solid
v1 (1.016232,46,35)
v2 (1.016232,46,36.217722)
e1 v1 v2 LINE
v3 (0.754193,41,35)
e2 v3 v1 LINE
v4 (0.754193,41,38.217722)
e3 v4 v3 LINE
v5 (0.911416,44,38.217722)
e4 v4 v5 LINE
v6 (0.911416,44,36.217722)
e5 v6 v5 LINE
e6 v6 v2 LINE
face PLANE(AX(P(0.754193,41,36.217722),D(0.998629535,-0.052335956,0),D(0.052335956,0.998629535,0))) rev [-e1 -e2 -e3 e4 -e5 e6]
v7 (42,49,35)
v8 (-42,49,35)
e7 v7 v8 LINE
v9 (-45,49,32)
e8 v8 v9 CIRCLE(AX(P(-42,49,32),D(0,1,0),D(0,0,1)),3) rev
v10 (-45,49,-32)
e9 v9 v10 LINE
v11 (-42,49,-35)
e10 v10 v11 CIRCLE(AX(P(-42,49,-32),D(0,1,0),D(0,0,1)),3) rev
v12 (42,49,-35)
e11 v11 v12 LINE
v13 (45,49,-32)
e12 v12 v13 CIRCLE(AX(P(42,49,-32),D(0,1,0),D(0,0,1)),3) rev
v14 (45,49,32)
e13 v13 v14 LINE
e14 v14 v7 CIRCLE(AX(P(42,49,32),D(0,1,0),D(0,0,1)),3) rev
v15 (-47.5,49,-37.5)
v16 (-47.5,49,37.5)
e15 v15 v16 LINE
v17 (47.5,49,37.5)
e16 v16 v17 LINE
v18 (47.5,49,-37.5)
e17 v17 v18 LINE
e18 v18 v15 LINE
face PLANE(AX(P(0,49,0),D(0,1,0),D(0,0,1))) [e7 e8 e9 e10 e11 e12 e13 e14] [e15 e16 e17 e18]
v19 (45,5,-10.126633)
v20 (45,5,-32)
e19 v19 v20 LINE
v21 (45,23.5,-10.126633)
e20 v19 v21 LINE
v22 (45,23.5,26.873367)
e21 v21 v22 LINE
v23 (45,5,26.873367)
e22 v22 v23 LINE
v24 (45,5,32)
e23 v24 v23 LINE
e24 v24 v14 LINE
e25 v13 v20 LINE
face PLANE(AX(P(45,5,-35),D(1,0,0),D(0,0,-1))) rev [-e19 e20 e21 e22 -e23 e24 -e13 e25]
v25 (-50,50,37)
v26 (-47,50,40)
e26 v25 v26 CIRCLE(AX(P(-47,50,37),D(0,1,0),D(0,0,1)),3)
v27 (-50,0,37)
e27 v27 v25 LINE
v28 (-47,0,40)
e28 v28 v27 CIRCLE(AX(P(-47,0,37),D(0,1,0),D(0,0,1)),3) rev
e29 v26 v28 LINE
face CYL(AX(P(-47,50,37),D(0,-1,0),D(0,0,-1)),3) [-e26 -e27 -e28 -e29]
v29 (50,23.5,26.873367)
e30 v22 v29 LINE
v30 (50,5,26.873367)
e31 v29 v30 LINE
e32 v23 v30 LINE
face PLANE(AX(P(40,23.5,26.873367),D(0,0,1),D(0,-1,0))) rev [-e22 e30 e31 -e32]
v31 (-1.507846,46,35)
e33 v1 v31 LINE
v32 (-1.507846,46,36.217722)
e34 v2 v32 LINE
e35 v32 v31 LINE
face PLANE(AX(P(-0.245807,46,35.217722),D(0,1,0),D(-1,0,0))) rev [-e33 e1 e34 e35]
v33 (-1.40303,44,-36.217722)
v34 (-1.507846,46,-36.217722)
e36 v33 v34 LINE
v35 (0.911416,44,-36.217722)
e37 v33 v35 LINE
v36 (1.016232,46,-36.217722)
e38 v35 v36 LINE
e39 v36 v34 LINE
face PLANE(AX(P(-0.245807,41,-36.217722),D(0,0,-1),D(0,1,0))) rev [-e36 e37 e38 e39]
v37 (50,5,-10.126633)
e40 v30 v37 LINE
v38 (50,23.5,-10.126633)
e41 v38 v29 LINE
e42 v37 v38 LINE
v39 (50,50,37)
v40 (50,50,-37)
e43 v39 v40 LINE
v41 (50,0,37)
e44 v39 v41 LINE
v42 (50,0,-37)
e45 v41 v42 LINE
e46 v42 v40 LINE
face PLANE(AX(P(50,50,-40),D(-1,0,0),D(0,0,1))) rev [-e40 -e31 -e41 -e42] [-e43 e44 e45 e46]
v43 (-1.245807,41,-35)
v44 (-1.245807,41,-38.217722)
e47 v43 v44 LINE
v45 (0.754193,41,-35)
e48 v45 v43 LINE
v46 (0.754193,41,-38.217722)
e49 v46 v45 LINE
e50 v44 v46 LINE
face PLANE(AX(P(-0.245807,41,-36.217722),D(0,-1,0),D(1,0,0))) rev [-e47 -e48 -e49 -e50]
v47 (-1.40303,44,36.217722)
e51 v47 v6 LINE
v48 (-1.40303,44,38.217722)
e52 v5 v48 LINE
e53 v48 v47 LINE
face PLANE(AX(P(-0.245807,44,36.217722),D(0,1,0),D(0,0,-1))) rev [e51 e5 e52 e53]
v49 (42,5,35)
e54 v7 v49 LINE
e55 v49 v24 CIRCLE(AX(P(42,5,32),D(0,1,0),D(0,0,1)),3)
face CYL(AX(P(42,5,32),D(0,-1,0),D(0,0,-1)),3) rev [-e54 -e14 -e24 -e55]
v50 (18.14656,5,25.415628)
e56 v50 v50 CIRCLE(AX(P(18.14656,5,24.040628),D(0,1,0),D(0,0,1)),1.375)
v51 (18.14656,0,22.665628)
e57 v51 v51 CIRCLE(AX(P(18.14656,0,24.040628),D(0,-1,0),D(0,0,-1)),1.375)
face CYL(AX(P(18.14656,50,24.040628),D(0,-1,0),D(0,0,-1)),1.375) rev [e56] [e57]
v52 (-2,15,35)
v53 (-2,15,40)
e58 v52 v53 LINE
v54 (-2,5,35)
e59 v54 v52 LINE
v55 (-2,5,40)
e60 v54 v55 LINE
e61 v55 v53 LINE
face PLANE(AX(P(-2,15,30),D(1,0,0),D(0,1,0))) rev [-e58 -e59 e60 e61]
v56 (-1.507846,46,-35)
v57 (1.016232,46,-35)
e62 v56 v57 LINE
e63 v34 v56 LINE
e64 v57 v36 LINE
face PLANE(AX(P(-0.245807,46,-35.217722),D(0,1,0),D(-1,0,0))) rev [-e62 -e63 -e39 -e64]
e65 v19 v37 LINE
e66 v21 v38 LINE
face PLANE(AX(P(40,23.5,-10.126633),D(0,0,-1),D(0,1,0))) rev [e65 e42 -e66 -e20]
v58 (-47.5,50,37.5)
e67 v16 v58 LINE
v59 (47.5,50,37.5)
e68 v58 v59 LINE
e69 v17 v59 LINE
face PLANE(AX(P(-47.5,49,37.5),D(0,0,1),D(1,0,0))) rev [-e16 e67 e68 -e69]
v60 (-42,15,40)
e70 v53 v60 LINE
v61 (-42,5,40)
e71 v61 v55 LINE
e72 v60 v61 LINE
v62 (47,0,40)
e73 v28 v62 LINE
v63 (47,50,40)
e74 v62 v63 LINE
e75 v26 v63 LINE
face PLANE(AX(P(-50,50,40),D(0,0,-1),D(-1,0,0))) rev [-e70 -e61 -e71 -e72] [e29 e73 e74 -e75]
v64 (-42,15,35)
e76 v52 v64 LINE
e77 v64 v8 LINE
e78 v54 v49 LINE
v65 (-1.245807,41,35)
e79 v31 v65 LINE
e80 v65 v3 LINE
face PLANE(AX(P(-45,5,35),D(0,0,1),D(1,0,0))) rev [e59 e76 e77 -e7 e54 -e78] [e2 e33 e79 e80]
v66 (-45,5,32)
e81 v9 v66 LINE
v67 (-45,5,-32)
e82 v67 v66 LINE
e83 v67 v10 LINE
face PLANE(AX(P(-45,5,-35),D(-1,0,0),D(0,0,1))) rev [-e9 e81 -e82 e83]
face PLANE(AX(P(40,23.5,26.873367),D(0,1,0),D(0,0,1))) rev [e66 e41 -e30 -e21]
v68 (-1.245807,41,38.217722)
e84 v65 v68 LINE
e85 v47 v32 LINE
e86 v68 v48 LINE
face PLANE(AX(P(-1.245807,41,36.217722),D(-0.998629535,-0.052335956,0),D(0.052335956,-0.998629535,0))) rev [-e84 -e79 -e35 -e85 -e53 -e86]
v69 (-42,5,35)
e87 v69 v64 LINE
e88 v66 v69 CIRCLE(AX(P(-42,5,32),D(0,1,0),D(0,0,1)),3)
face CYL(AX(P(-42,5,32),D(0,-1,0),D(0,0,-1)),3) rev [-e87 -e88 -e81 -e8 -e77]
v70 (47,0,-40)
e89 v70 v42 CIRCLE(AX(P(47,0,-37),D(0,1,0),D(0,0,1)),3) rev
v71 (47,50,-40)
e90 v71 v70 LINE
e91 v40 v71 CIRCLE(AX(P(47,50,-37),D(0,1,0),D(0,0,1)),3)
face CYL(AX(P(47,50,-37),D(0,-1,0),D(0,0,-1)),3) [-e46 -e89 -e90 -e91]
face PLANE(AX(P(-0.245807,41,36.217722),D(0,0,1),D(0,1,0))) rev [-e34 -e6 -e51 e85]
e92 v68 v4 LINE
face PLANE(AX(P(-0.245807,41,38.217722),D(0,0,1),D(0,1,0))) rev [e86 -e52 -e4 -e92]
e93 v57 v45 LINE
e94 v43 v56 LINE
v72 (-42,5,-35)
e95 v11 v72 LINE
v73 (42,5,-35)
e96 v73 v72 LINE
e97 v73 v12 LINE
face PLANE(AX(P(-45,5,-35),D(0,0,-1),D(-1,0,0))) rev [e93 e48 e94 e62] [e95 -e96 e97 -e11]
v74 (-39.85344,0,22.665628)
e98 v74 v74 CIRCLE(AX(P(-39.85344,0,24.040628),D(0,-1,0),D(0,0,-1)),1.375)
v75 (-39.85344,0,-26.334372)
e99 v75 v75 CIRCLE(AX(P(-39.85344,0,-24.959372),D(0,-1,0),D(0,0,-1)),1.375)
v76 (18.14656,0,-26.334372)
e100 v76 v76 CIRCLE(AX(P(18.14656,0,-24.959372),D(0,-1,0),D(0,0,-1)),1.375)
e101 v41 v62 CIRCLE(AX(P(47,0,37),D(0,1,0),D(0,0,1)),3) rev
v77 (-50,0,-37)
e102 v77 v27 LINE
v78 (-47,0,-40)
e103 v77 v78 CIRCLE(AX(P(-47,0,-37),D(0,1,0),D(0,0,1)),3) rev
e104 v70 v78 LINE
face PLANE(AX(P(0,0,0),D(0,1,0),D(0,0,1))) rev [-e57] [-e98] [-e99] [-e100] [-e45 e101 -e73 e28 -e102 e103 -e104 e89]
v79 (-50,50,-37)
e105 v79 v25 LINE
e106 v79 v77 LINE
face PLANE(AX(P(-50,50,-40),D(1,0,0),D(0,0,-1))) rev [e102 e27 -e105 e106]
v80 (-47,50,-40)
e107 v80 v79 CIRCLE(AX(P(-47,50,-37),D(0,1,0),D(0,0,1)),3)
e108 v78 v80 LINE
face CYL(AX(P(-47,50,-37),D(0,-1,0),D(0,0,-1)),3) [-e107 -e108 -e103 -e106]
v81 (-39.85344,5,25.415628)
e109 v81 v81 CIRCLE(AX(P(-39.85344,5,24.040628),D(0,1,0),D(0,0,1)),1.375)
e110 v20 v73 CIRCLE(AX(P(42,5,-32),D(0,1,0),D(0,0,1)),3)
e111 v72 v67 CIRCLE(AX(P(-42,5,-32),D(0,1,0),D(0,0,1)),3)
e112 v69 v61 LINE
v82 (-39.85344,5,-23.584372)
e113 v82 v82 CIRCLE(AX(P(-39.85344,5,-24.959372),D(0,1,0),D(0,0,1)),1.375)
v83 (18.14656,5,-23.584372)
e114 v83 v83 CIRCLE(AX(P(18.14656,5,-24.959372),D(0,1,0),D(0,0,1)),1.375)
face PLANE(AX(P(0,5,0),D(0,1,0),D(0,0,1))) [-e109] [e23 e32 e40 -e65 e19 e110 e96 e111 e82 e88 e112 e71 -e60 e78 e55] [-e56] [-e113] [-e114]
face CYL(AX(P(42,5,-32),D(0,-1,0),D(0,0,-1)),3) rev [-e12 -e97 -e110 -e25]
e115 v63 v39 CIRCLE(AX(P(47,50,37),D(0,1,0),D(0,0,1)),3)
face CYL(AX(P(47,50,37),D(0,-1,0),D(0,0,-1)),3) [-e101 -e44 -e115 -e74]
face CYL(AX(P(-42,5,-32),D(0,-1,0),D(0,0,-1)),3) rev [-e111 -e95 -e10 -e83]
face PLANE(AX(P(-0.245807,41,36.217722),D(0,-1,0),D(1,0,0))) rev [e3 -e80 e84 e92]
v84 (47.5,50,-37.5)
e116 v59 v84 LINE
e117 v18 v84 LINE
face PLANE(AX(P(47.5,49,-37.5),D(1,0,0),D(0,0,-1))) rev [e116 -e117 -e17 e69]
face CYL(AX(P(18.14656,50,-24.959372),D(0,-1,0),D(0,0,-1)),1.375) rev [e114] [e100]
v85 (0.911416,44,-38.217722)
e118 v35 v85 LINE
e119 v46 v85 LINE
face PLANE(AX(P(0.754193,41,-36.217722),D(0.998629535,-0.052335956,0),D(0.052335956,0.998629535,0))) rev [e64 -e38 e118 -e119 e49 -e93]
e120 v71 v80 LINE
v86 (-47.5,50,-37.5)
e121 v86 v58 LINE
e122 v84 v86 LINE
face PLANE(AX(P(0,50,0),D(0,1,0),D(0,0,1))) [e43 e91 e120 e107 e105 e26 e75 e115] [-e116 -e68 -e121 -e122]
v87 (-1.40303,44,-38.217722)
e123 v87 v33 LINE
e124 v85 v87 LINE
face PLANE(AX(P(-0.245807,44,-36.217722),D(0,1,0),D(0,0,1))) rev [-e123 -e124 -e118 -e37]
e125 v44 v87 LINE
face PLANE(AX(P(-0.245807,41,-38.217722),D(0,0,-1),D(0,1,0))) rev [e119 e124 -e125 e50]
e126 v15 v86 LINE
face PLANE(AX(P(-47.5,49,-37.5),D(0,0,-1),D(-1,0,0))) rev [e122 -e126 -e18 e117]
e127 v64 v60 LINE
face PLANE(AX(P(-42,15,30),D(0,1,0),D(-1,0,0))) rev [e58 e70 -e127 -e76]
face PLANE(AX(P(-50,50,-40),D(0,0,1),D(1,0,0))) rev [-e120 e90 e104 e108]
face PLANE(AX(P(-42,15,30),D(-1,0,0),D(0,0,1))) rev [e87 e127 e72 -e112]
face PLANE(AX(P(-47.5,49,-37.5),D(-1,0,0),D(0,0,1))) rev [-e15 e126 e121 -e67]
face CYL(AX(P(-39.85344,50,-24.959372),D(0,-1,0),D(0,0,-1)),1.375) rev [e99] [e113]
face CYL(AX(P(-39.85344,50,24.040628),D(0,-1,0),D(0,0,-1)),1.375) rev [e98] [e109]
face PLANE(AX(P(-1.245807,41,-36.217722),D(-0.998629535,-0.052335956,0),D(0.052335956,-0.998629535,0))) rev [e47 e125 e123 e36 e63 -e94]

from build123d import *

# Parameters (mm, degrees)
SKETCH2_W            = 100
SKETCH2_H            = 80
BOSS_EXTRUDE1_DEPTH  = 50
SKETCH3_W            = 90
SKETCH3_H            = 70
CUT_EXTRUDE1_DEPTH   = 45
FILLET2_R            = 3
SKETCH4_W            = 95
SKETCH4_H            = 75
CUT_EXTRUDE2_DEPTH   = 1
SKETCH5_W            = 40
SKETCH5_H            = 10
CUT_EXTRUDE3_DEPTH   = 10
SNAP_START           = -38.217722162
SNAP_GROOVE1_DEPTH   = 3.217722162
SNAP_START_2         = -36.217722162
SNAP_GROOVE1_2_DEPTH = 1.217722162
SKETCH8_R            = 1.375
CUT_EXTRUDE4_DEPTH   = 82.240384046
LPATTERN1_COUNT      = 2
LPATTERN1_PITCH      = 58
LPATTERN1_COUNT_DIR2 = 2
LPATTERN1_PITCH_DIR2 = 49
SKETCH9_W            = 37
SKETCH9_H            = 18.5
CUT_EXTRUDE6_DEPTH   = 10


# Read off the part's stored shape, not the designer's step: Snap Groove1
with BuildPart() as part:
    # Sketch2 → Boss-Extrude1 (new body)
    with BuildSketch(Plane(origin=(0, 0, 0), x_dir=(1, 0, 0), z_dir=(0, 1, 0))):
        Rectangle(SKETCH2_W, SKETCH2_H)
    extrude(amount=BOSS_EXTRUDE1_DEPTH)

    # Sketch3 → Cut-Extrude1 (cut)
    with BuildSketch(Plane(origin=(0, 50, 0), x_dir=(1, 0, 0), z_dir=(0, 1, 0))):
        Rectangle(SKETCH3_W, SKETCH3_H)
    extrude(amount=-CUT_EXTRUDE1_DEPTH, mode=Mode.SUBTRACT)

    # Fillet2
    fillet2_edges = [part.edges().sort_by_distance(p)[0] for p in [
        (45, 27.5, -35),
        (45, 27.5, 35),
        (-45, 27.5, 35),
        (-45, 27.5, -35),
        (50, 25, 40),
        (-50, 25, 40),
        (-50, 25, -40),
        (50, 25, -40),
    ]]
    fillet(fillet2_edges, radius=FILLET2_R)

    # Sketch4 → Cut-Extrude2 (cut)
    with BuildSketch(Plane(origin=(0, 50, 0), x_dir=(1, 0, 0), z_dir=(0, 1, 0))):
        Rectangle(SKETCH4_W, SKETCH4_H)
    extrude(amount=-CUT_EXTRUDE2_DEPTH, mode=Mode.SUBTRACT)

    # Sketch5 → Cut-Extrude3 (cut)
    with BuildSketch(Plane.XY.offset(40)):
        with Locations((-22, 10)):
            Rectangle(SKETCH5_W, SKETCH5_H)
    extrude(amount=-CUT_EXTRUDE3_DEPTH, mode=Mode.SUBTRACT)

    # Snap Groove1 outline → Snap Groove1 (cut)
    with BuildSketch(Plane.XY.offset(SNAP_START)):
        Polygon((-1.245807146, 41), (0.754192854, 41), (0.911416192, 44), (-1.403030484, 44), align=None)
    snap_groove1 = extrude(amount=SNAP_GROOVE1_DEPTH, mode=Mode.SUBTRACT)

    # Snap Groove1 2 outline → Snap Groove1 2 (cut)
    with BuildSketch(Plane.XY.offset(SNAP_START_2)):
        Polygon((-1.403030484, 44), (0.911416192, 44), (1.01623175, 46), (-1.507846042, 46), align=None)
    snap_groove1_2 = extrude(amount=SNAP_GROOVE1_2_DEPTH, mode=Mode.SUBTRACT)

    # Mirror1: Snap Groove1, Snap Groove1 2 across plane
    add(snap_groove1.mirror(Plane.XY), mode=Mode.SUBTRACT)
    add(snap_groove1_2.mirror(Plane.XY), mode=Mode.SUBTRACT)

    # Sketch8 → Cut-Extrude4 (cut, through all)
    with BuildSketch(Plane.XZ):
        with Locations(Location((18.146559745, 24.040628208, 0), (0, 0, 270))):
            Circle(SKETCH8_R)
    cut_extrude4 = extrude(amount=-CUT_EXTRUDE4_DEPTH, mode=Mode.SUBTRACT)

    # LPattern1: Cut-Extrude4 2 × 2
    with Locations(*[(-i * LPATTERN1_PITCH, 0, -j * LPATTERN1_PITCH_DIR2) for i in range(LPATTERN1_COUNT) for j in range(LPATTERN1_COUNT_DIR2) if (i, j) != (0, 0)]):
        add(cut_extrude4, mode=Mode.SUBTRACT)

    # Sketch9 → Cut-Extrude6 (cut)
    with BuildSketch(Plane(origin=(50, 0, 0), x_dir=(0, 0, -1), z_dir=(1, 0, 0))):
        with Locations((-8.373367198, 14.25)):
            Rectangle(SKETCH9_W, SKETCH9_H)
    extrude(amount=-CUT_EXTRUDE6_DEPTH, mode=Mode.SUBTRACT)


solid = part.part
